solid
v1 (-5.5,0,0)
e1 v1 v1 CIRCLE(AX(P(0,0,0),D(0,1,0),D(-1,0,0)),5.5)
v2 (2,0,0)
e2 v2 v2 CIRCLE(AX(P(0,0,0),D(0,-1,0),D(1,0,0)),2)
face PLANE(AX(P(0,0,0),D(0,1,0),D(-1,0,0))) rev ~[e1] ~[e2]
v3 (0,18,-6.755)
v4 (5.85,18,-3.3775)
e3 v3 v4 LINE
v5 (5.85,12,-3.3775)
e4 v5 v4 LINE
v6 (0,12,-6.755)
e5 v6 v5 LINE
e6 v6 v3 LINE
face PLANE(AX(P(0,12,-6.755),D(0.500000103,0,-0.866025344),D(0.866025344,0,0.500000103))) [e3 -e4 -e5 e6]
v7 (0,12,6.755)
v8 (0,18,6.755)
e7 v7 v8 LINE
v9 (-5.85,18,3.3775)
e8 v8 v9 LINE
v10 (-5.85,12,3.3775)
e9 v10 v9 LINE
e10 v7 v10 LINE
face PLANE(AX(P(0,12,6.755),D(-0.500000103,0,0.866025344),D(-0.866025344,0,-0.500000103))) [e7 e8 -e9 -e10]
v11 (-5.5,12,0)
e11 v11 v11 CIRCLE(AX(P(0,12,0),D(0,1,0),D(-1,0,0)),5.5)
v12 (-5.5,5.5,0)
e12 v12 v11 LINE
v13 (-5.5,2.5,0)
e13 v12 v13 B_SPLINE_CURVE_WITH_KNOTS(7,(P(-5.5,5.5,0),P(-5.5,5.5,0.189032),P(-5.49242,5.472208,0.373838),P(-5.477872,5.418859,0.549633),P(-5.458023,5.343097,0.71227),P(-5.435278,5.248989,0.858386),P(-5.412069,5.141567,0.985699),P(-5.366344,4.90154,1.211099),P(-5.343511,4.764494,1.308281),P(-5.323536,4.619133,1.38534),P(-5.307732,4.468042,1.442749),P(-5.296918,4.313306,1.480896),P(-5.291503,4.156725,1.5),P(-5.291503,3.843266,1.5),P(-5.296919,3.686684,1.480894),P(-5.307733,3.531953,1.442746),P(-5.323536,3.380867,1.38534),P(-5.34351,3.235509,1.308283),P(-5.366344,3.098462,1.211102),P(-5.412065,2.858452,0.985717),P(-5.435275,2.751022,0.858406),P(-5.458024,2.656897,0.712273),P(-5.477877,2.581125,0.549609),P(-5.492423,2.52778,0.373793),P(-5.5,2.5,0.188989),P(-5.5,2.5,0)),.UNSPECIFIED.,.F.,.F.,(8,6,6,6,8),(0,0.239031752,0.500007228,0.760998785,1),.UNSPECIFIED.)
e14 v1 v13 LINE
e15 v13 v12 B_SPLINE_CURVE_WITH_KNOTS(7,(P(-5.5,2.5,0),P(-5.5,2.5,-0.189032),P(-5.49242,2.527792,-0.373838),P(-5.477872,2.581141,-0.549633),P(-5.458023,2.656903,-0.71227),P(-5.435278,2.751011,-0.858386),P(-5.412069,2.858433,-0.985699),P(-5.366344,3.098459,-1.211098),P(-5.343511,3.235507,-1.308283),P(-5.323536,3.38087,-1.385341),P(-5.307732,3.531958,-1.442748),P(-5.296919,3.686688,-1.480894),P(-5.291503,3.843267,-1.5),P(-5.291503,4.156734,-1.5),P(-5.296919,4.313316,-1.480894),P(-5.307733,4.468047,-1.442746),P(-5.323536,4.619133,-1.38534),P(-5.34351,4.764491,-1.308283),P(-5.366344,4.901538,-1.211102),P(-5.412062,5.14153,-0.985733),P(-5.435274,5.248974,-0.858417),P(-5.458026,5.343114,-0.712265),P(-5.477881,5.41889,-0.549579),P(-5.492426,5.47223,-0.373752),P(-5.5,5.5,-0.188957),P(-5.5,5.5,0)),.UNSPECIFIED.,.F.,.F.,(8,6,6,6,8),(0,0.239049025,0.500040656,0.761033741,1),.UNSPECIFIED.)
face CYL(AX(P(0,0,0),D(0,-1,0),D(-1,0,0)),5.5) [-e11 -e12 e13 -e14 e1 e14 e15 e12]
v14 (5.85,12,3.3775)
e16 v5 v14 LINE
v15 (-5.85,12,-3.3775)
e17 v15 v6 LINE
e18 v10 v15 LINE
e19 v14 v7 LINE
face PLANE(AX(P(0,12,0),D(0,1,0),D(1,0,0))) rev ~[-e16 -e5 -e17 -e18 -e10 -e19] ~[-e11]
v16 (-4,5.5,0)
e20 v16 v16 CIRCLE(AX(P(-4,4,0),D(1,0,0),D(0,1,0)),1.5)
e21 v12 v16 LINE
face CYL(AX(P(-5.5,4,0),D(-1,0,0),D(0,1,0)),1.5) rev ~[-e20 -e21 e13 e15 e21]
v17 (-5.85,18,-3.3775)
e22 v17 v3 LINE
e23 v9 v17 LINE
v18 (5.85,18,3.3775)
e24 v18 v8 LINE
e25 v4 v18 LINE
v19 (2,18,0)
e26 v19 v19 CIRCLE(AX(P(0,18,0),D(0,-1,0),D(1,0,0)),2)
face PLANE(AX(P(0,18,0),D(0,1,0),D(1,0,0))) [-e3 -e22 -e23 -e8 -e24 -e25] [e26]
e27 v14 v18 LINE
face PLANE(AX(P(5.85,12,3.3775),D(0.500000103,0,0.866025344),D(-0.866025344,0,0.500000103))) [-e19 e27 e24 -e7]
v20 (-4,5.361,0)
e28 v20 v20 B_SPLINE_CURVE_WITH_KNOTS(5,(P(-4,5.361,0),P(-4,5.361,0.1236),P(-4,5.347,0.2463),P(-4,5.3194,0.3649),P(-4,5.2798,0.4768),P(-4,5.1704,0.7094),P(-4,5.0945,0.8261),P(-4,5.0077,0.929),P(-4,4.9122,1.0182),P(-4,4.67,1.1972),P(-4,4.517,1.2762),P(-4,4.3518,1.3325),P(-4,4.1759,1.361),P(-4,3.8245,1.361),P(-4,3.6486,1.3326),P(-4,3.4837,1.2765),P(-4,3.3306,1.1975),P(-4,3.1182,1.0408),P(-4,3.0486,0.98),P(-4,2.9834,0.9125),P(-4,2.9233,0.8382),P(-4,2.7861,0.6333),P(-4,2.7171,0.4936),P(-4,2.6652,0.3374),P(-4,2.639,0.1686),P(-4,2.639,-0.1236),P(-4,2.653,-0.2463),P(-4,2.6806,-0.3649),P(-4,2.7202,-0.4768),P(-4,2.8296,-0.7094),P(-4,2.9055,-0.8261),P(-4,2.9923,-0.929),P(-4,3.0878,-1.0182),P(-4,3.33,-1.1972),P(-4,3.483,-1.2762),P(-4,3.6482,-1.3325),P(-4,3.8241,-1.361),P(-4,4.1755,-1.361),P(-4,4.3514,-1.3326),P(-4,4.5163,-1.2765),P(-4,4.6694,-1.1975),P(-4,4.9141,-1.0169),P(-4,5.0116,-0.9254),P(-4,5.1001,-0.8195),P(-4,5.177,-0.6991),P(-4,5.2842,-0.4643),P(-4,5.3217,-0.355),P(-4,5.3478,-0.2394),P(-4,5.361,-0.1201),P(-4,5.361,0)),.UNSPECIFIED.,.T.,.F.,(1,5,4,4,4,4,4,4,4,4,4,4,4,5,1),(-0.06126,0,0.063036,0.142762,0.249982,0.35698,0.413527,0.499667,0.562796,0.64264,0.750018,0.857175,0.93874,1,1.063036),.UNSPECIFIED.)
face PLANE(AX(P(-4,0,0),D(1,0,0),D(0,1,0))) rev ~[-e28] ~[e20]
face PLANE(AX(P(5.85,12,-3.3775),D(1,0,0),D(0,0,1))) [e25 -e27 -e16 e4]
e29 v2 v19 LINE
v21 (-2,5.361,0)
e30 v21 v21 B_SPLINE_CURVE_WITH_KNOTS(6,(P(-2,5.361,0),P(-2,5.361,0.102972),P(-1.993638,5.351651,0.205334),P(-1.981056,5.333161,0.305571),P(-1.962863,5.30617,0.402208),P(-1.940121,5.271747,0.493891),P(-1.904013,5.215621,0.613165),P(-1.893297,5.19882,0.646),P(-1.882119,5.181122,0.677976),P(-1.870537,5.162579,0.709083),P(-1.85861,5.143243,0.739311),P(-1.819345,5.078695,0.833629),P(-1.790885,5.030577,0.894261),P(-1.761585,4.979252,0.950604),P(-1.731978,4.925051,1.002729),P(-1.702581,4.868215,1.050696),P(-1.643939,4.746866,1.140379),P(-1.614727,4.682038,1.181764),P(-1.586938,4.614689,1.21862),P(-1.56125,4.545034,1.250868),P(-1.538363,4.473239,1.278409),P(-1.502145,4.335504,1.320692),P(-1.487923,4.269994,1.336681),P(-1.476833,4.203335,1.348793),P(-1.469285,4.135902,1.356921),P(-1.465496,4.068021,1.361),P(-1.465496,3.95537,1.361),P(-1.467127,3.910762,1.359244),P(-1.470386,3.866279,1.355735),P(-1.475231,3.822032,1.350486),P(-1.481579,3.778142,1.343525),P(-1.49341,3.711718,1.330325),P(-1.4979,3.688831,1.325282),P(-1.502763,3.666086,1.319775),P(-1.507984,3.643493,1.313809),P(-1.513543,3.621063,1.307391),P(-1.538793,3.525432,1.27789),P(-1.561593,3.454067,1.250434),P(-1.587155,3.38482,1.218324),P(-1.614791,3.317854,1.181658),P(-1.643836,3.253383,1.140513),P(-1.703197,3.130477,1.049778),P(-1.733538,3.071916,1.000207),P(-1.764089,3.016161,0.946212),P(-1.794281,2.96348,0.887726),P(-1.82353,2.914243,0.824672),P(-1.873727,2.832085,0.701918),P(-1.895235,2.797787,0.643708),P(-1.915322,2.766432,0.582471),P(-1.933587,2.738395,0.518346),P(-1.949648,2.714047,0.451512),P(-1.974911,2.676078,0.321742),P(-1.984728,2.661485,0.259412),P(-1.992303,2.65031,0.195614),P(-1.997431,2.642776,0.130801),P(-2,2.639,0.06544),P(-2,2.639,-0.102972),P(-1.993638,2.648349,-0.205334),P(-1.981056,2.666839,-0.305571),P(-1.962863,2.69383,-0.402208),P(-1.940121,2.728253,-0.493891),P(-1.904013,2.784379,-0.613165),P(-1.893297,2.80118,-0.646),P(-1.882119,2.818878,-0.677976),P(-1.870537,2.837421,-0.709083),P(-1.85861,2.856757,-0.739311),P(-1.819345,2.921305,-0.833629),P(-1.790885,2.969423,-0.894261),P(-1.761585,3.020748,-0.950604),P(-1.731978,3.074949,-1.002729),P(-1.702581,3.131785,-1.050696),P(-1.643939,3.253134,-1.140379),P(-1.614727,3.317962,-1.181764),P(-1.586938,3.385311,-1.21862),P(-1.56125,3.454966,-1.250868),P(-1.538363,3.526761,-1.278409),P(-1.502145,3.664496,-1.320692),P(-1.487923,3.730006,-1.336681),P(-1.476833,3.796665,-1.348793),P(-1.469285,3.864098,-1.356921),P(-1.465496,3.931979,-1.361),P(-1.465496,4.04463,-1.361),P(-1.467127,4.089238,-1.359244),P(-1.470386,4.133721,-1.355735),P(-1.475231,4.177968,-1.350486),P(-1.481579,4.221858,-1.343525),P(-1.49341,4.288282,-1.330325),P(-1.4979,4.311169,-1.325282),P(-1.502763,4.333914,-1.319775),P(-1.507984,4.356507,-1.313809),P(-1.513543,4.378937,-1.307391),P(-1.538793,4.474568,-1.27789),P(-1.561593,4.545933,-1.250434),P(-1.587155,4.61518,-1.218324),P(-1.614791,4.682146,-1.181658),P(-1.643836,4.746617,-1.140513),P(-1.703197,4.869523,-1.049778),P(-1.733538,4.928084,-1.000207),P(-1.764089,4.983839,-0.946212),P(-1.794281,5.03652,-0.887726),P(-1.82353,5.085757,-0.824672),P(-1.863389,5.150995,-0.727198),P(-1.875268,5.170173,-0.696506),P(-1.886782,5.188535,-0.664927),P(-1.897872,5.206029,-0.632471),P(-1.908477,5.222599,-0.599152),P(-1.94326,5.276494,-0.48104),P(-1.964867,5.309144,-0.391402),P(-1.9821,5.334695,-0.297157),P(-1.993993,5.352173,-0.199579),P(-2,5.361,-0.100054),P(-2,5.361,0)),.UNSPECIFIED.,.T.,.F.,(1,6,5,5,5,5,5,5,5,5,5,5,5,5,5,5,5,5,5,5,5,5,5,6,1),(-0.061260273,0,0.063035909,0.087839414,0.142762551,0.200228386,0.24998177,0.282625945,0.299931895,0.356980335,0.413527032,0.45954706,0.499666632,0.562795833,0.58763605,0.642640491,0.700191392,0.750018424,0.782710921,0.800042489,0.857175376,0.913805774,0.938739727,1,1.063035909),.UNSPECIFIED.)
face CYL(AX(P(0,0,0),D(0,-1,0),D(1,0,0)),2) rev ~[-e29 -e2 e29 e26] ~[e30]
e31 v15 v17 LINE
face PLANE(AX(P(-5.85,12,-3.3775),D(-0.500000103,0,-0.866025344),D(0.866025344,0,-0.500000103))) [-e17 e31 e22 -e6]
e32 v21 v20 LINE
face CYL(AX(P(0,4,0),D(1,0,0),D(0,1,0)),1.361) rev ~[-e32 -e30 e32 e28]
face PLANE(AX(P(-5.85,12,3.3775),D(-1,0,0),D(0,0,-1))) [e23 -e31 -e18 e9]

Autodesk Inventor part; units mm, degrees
ref_plane "XZ Plane" through (0, 0, 0) normal (0, 1, 0) x (-1, 0, 0)
ref_plane "XY Plane" through (0, 0, 0) normal (0, 0, 1) x (1, 0, 0)
sketch "草圖1" plane through (0, 0, 0) normal (0, 1, 0) x (-1, 0, 0)
  circle A0 centre (0, 0) radius 5.5
  dimension "d0" = 11
extrude "擠出1" add sketch "草圖1" along normal blind 12
sketch "草圖2" plane through (0, 12, 0) normal (0, 1, 0) x (1, 0, 0)
  line L0 (5.85, -3.3775) -> (0, -6.755)
  line L1 (0, -6.755) -> (-5.85, -3.3775)
  line L2 (-5.85, -3.3775) -> (-5.85, 3.3775)
  line L3 (-5.85, 3.3775) -> (0, 6.755)
  line L4 (0, 6.755) -> (5.85, 3.3775)
  line L5 (5.85, 3.3775) -> (5.85, -3.3775)
  point P0 (0, 0)
  point P1 (0, 0)
  dimension "d3" = 11.7
extrude "擠出2" add sketch "草圖2" along normal blind 6
sketch "草圖3" plane through (0, 0, 0) normal (0, -1, 0) x (1, 0, 0)
  circle A0 centre (0, 0) radius 2
  dimension "d6" = 4
extrude "擠出3" cut sketch "草圖3" against normal up to surface (18 mm away)
sketch "草圖5" plane through (0, 0, 0) normal (1, 0, 0) x (0, 1, 0)
  circle A0 centre (4, 0) radius 1.361
  point P0 (0, 0)
  dimension "d12" = 4
extrude "擠出5" cut sketch "草圖5" against normal through all
sketch "草圖6" plane through (0, 0, 0) normal (0, -1, 0) x (1, 0, 0)
  circle A0 centre (0, 0) radius 2 projected
  circle A1 centre (0, 0) radius 5.5 projected
  circle A2 centre (0, 0) radius 2 projected
  line L0 (1.0536, 1.7) -> (-1.0536, 1.7)
  dimension "d15" = 1.7
ref_plane "工作平面2" through (-5.5, 0, 0) normal (1, 0, 0) x (0, 1, 0)
ref_plane "工作平面1" through (5.5, 0, 0) normal (1, 0, 0) x (0, 1, 0)
sketch "草圖7" plane through (-5.5, 0, 0) normal (1, 0, 0) x (0, 1, 0)
  spline S0 degree 5 poles (5.361, 0) (5.361, 0.1236) (5.347, 0.2463) (5.3194, 0.3649) (5.2798, 0.4768) (5.1704, 0.7094) (5.0945, 0.8261) (5.0077, 0.929) (4.9122, 1.0182) (4.67, 1.1972) (4.517, 1.2762) (4.3518, 1.3325) (4.1759, 1.361) (3.8245, 1.361) (3.6486, 1.3326) (3.4837, 1.2765) (3.3306, 1.1975) (3.1182, 1.0408) (3.0486, 0.98) (2.9834, 0.9125) (2.9233, 0.8382) (2.7861, 0.6333) (2.7171, 0.4936) (2.6652, 0.3374) (2.639, 0.1686) (2.639, -0.1236) (2.653, -0.2463) (2.6806, -0.3649) (2.7202, -0.4768) (2.8296, -0.7094) (2.9055, -0.8261) (2.9923, -0.929) (3.0878, -1.0182) (3.33, -1.1972) (3.483, -1.2762) (3.6482, -1.3325) (3.8241, -1.361) (4.1755, -1.361) (4.3514, -1.3326) (4.5163, -1.2765) (4.6694, -1.1975) (4.9141, -1.0169) (5.0116, -0.9254) (5.1001, -0.8195) (5.177, -0.6991) (5.2842, -0.4643) (5.3217, -0.355) (5.3478, -0.2394) (5.361, -0.1201) (5.361, 0) knots 0 0 0 0 0 0 0.063036 0.063036 0.063036 0.063036 0.142762 0.142762 0.142762 0.142762 0.249982 0.249982 0.249982 0.249982 0.35698 0.35698 0.35698 0.35698 0.413527 0.413527 0.413527 0.413527 0.499667 0.499667 0.499667 0.499667 0.562796 0.562796 0.562796 0.562796 0.64264 0.64264 0.64264 0.64264 0.750018 0.750018 0.750018 0.750018 0.857175 0.857175 0.857175 0.857175 0.93874 0.93874 0.93874 0.93874 1 1 1 1 1 1 projected
  circle A0 centre (4, 0) radius 1.5
  point P0 (0, 0)
  dimension "d17" = 3
extrude "擠出6" cut sketch "草圖7" along normal blind 1.5
properties part number "Coupling"
